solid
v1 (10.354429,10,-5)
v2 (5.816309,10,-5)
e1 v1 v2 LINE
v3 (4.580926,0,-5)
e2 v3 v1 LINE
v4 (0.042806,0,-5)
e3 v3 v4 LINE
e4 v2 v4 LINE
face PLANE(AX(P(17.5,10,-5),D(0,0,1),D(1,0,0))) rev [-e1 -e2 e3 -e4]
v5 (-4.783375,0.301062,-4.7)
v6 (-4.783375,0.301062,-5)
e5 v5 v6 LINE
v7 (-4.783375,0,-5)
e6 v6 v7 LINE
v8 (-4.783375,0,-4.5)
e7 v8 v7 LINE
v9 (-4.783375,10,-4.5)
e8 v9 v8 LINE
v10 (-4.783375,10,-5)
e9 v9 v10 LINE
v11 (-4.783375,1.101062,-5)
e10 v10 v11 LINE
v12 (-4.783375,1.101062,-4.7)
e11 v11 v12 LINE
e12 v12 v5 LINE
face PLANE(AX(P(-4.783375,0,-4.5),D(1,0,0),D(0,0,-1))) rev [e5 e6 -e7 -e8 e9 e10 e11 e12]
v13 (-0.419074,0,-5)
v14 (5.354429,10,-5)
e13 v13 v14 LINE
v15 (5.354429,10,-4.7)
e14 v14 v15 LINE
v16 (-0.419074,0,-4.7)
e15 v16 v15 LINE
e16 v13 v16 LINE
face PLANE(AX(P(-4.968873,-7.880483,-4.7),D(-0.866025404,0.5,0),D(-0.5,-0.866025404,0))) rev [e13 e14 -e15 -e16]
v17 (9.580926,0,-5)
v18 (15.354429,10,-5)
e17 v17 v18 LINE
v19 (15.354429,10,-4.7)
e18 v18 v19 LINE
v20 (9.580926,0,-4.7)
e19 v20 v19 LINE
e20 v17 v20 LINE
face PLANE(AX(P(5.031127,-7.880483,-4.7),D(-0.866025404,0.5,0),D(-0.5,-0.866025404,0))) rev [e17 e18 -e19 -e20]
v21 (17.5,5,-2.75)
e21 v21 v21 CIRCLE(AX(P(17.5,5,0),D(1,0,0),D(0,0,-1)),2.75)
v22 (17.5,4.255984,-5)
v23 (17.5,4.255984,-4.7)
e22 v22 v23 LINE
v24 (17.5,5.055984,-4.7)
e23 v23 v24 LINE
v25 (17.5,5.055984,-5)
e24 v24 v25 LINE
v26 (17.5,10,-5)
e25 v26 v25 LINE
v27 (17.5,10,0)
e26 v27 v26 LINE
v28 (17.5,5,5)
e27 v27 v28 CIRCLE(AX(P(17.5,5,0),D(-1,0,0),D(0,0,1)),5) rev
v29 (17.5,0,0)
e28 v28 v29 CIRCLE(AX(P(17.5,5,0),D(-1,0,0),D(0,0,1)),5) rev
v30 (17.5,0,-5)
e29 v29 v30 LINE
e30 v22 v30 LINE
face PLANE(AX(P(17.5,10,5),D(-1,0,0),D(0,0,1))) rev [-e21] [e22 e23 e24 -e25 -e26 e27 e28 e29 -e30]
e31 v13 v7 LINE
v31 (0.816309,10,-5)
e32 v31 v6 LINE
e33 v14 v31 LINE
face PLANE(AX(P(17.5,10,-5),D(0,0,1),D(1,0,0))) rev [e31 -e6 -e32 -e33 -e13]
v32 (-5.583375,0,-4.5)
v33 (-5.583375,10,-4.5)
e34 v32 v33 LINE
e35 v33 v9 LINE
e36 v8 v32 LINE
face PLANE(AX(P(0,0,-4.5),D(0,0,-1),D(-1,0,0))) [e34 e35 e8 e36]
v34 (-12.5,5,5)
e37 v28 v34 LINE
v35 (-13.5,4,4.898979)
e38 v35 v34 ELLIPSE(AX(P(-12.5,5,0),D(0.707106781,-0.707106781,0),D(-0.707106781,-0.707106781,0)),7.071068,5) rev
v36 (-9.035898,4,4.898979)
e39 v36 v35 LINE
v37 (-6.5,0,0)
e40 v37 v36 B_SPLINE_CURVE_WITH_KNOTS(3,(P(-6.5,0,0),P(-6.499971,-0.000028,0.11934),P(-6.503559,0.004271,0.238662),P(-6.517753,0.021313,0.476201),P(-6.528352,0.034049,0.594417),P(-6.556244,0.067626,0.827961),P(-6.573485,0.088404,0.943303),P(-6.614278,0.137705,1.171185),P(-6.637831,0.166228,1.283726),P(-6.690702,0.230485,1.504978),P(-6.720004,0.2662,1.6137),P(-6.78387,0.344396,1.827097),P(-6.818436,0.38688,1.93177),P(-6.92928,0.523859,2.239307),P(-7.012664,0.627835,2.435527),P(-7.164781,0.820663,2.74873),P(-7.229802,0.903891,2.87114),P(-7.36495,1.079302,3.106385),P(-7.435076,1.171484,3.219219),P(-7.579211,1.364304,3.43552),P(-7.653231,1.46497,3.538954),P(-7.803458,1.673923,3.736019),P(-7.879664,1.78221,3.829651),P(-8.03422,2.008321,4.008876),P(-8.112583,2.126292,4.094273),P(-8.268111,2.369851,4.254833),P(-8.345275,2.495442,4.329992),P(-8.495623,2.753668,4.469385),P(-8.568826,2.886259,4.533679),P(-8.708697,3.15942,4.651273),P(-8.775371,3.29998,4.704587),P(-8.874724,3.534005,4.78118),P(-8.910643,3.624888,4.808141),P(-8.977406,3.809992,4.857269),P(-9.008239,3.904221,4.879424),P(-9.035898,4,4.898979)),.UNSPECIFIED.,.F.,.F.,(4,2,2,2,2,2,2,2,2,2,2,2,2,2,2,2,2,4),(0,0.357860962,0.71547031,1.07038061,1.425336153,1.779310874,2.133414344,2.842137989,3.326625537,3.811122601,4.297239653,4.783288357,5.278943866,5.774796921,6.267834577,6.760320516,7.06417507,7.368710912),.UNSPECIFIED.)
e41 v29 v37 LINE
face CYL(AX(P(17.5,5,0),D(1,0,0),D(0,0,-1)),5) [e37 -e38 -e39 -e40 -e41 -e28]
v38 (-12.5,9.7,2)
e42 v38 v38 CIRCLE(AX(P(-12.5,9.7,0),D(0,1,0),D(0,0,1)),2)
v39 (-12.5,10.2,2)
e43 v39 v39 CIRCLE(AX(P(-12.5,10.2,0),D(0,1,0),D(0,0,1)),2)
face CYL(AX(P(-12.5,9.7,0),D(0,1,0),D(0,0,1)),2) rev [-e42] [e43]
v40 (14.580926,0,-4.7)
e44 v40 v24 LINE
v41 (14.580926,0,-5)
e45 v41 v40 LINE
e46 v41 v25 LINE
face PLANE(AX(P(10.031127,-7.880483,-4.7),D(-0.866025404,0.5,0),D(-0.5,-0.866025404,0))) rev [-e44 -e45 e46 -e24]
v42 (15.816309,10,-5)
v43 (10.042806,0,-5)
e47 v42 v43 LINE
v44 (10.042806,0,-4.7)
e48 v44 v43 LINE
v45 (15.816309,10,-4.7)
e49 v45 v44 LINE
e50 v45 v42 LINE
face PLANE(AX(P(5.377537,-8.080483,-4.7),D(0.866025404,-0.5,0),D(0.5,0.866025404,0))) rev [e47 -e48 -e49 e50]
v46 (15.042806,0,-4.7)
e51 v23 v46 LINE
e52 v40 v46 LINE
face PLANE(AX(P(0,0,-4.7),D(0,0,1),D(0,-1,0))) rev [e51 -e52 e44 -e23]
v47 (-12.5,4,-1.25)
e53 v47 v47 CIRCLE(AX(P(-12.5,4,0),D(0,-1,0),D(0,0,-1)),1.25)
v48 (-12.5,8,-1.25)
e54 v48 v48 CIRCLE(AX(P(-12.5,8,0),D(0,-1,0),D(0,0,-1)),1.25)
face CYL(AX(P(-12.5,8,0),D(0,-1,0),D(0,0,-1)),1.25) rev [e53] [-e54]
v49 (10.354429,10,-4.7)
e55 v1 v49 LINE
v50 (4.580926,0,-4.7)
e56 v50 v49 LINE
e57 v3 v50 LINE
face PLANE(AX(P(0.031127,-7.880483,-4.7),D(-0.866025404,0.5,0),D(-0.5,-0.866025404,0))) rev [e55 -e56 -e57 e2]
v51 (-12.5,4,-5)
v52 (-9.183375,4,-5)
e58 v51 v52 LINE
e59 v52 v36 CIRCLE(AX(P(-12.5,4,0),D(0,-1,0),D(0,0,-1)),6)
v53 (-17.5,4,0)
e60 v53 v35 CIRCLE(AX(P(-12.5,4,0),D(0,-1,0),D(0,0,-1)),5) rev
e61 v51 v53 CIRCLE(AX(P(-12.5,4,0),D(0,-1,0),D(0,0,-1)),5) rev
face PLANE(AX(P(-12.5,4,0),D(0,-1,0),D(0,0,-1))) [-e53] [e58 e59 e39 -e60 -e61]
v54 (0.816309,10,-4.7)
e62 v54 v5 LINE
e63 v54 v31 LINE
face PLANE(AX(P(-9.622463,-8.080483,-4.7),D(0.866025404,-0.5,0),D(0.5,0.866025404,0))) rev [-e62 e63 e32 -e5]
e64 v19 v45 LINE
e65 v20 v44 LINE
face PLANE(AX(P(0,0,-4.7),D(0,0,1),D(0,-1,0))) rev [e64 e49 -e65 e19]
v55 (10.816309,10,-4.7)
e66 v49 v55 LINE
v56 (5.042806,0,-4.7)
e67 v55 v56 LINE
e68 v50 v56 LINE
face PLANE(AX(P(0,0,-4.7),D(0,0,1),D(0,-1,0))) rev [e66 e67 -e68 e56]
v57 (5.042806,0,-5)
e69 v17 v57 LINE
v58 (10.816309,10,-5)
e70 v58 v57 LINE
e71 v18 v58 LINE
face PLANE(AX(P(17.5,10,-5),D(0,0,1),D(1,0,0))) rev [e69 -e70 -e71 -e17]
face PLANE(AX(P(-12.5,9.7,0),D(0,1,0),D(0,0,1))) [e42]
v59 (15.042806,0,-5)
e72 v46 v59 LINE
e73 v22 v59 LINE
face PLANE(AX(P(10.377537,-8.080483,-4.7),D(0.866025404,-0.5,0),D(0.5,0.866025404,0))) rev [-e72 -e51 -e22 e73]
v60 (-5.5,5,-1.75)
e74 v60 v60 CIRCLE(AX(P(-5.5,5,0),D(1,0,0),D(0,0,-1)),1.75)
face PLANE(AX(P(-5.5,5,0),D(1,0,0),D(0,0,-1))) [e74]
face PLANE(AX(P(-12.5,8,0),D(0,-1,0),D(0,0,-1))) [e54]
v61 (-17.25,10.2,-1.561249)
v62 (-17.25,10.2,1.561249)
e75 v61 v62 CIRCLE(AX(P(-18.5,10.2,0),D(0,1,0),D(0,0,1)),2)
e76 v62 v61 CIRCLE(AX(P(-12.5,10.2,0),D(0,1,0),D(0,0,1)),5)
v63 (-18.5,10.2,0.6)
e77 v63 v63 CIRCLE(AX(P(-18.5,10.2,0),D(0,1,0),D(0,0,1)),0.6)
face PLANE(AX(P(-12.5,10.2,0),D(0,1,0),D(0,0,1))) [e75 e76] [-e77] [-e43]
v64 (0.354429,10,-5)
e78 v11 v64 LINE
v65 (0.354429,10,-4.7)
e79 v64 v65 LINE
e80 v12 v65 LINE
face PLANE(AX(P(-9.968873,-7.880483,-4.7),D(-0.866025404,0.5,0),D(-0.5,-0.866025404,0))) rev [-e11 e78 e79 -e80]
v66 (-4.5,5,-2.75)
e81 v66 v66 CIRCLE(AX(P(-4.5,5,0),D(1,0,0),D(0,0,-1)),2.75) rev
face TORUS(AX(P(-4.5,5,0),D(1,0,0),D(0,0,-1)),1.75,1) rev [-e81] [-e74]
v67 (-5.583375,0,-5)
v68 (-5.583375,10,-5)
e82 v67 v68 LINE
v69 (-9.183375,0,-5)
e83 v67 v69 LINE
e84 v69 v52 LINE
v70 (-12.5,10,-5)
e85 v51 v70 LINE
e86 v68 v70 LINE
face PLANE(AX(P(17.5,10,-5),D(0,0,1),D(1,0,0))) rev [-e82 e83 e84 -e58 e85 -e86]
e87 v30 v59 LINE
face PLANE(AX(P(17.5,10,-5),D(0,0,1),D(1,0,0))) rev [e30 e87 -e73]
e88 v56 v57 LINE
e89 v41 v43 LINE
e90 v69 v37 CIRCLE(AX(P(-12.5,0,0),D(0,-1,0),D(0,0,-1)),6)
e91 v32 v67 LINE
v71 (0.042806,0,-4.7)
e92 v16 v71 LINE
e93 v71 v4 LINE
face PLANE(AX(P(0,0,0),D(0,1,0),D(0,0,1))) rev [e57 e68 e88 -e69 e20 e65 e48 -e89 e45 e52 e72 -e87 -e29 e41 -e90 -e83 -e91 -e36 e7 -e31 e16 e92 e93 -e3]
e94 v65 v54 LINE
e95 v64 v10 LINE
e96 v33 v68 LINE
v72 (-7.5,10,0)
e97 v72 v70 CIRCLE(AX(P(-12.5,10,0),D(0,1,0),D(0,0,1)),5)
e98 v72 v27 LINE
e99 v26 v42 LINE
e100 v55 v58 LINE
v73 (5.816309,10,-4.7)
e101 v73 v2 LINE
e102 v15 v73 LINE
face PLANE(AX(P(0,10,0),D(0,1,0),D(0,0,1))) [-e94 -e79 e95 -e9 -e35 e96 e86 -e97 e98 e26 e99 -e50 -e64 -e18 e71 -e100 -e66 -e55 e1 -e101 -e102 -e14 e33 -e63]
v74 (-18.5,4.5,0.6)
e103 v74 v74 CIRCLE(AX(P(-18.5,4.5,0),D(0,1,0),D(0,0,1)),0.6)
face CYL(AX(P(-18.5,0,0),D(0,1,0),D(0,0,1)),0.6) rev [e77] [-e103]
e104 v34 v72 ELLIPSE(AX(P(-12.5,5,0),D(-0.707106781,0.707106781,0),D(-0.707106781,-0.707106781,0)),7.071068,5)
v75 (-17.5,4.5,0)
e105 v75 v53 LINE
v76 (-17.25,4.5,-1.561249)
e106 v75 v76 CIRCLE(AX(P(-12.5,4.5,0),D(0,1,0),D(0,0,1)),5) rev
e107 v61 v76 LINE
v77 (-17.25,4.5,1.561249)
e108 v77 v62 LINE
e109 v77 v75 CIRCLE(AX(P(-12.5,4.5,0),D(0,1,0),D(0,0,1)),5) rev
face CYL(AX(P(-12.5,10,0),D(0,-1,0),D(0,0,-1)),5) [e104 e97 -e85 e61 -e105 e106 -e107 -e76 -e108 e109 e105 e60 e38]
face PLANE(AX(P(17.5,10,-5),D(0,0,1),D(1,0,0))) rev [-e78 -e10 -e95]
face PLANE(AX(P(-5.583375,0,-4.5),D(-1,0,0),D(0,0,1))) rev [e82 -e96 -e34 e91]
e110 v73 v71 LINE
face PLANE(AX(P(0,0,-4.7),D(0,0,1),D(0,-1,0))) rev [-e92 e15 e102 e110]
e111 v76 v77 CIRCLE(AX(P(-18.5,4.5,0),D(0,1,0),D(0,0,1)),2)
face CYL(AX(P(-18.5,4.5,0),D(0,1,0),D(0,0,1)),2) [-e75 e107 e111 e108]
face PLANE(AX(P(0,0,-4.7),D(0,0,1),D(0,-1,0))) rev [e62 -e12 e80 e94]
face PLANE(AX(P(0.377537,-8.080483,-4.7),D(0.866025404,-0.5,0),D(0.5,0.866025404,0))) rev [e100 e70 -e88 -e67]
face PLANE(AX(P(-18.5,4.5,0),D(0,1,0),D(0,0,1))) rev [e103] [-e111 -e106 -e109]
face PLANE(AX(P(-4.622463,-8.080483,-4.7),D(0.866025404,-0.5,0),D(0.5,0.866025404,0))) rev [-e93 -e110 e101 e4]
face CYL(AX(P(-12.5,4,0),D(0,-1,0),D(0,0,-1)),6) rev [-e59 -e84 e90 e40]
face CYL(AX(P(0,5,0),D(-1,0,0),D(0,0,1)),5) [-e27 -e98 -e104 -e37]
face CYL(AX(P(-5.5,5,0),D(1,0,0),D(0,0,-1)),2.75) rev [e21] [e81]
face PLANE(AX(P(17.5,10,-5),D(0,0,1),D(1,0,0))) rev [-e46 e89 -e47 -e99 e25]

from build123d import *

# Parameters (mm, degrees)
SKETCH_1_W          = 35
SKETCH_1_H          = 10
EXTRUDE_1_DEPTH     = 10
FILLET_1_R          = 5
SKETCH_3_R          = 6
CUT_EXTRUDE_1_DEPTH = 4
SKETCH_7_R          = 5
EXTRUDE_4_DEPTH     = 0.2
SKETCH_8_R          = 2
CUT_EXTRUDE_3_DEPTH = 0.5
FILLET_3_R          = 5
SKETCH_10_R         = 2
EXTRUDE_5_DEPTH     = 5.7
SKETCH_11_R         = 0.6
CUT_EXTRUDE_4_DEPTH = 24.436936812
SKETCH_12_R         = 2.75
CUT_EXTRUDE_5_DEPTH = 23
SKETCH_6_R          = 1.25
CUT_EXTRUDE_6_DEPTH = 4
FILLET_4_R          = 1
SKETCH_13_W         = 0.8
SKETCH_13_H         = 10
CUT_EXTRUDE_7_DEPTH = 0.5
CUT_EXTRUDE_8_DEPTH = 0.3


# Some blends are built 0.0001 mm under size
with BuildPart() as part:
    # 草图1 → 凸台-拉伸1 (new body)
    with BuildSketch(Plane(origin=(0, 0, 0), x_dir=(1, 0, 0), z_dir=(0, 1, 0))):
        Rectangle(SKETCH_1_W, SKETCH_1_H)
    extrude(amount=EXTRUDE_1_DEPTH)

    # 圆角1
    fillet_1_edges = [part.edges().sort_by_distance(p)[0] for p in [
        (-17.5, 5, 5),
        (-17.5, 5, -5),
    ]]
    fillet(fillet_1_edges, radius=FILLET_1_R - 0.0001)  # a hair under: the kernel refuses the full size

    # 草图3 → 切除-拉伸1 (cut)
    with BuildSketch(Plane.XZ):
        with Locations((-12.5, 0)):
            Circle(SKETCH_3_R)
    extrude(amount=-CUT_EXTRUDE_1_DEPTH, mode=Mode.SUBTRACT)

    # 草图7 → 凸台-拉伸4 (add)
    with BuildSketch(Plane(origin=(0, 10, 0), x_dir=(1, 0, 0), z_dir=(0, 1, 0))):
        with Locations(Location((-12.5, 0, 0), (0, 0, 270))):
            Circle(SKETCH_7_R)
    extrude(amount=EXTRUDE_4_DEPTH)

    # 草图8 → 切除-拉伸3 (cut)
    with BuildSketch(Plane(origin=(0, 10.2, 0), x_dir=(1, 0, 0), z_dir=(0, 1, 0))):
        with Locations(Location((-12.5, 0, 0), (0, 0, 270))):
            Circle(SKETCH_8_R)
    extrude(amount=-CUT_EXTRUDE_3_DEPTH, mode=Mode.SUBTRACT)

    # 圆角3
    # the kernel refuses this fillet: 5 mm, written as the material it takes off along each edge
    with BuildSketch(Plane(origin=(30, 0, 5), x_dir=(0, 1, 0), z_dir=(-1, 0, 0))) as fillet_3_piece_1:
        with BuildLine():
            CenterArc((FILLET_3_R, FILLET_3_R), FILLET_3_R, 180, 90)
            Line((0, FILLET_3_R), (0, 0))
            Line((0, 0), (FILLET_3_R, 0))
        make_face()
    extrude(amount=51.68337521, mode=Mode.SUBTRACT)
    with BuildSketch(Plane(origin=(30, 10, 5), x_dir=(0, -1, 0), z_dir=(-1, 0, 0))) as fillet_3_piece_2_section:
        with BuildLine():
            CenterArc((FILLET_3_R, -FILLET_3_R), FILLET_3_R, 90, 90)
            Line((0, -FILLET_3_R), (0, 0))
            Line((0, 0), (FILLET_3_R, 0))
        make_face()
    fillet_3_piece_2 = extrude(amount=55, mode=Mode.PRIVATE)
    fillet_3_piece_2 = fillet_3_piece_2 - Plane(origin=(-12.5, 8.593554342, 0), x_dir=(0, 0, 1), z_dir=(0, -1, 0)) * Cylinder(5, 130, mode=Mode.PRIVATE)
    add(fillet_3_piece_2, mode=Mode.SUBTRACT)

    # 草图10 → 凸台-拉伸5 (add)
    with BuildSketch(Plane(origin=(0, 10.2, 0), x_dir=(1, 0, 0), z_dir=(0, 1, 0))):
        with Locations((-18.5, 0)):
            Circle(SKETCH_10_R)
    extrude(amount=-EXTRUDE_5_DEPTH)

    # 草图11 → 切除-拉伸4 (cut, through all)
    with BuildSketch(Plane(origin=(0, 10.2, 0), x_dir=(1, 0, 0), z_dir=(0, 1, 0))):
        with Locations(Location((-18.5, 0, 0), (0, 0, 270))):
            Circle(SKETCH_11_R)
    extrude(amount=-CUT_EXTRUDE_4_DEPTH, mode=Mode.SUBTRACT)

    # 草图12 → 切除-拉伸5 (cut)
    with BuildSketch(Plane(origin=(17.5, 0, 0), x_dir=(0, 0, -1), z_dir=(1, 0, 0))):
        with Locations((0, 5)):
            Circle(SKETCH_12_R)
    extrude(amount=-CUT_EXTRUDE_5_DEPTH, mode=Mode.SUBTRACT)

    # 草图6 → 切除-拉伸6 (cut)
    with BuildSketch(Plane.XZ.offset(-4)):
        with Locations(Location((-12.5, 0, 0), (0, 0, 270))):
            Circle(SKETCH_6_R)
    extrude(amount=-CUT_EXTRUDE_6_DEPTH, mode=Mode.SUBTRACT)

    # 圆角4
    fillet_4_edges = [part.edges().sort_by_distance(p)[0] for p in [
        (-5.5, 5, 2.75),
    ]]
    fillet(fillet_4_edges, radius=FILLET_4_R)

    # 草图13 → 切除-拉伸7 (cut)
    with BuildSketch(Plane(origin=(0, 0, -5), x_dir=(-1, 0, 0), z_dir=(0, 0, -1))):
        with Locations((5.18337521, 5)):
            Rectangle(SKETCH_13_W, SKETCH_13_H)
    extrude(amount=-CUT_EXTRUDE_7_DEPTH, mode=Mode.SUBTRACT)

    # 草图14 → 切除-拉伸8 (cut)
    with BuildSketch(Plane(origin=(0, 0, -5), x_dir=(-1, 0, 0), z_dir=(0, 0, -1))):
        Polygon((-10.031126924, -7.880483284), (-20.59026218, 10.408475463), (-20.936672342, 10.208475463), (-10.377537086, -8.080483284), align=None)
        Polygon((-5.031126924, -7.880483284), (-15.59026218, 10.408475463), (-15.936672342, 10.208475463), (-5.377537086, -8.080483284), align=None)
        Polygon((-0.031126924, -7.880483284), (-10.59026218, 10.408475463), (-10.936672342, 10.208475463), (-0.377537086, -8.080483284), align=None)
        Polygon((4.968873076, -7.880483284), (-5.59026218, 10.408475463), (-5.936672342, 10.208475463), (4.622462914, -8.080483284), align=None)
        Polygon((9.968873076, -7.880483284), (-0.59026218, 10.408475463), (-0.936672342, 10.208475463), (9.622462914, -8.080483284), align=None)
    extrude(amount=-CUT_EXTRUDE_8_DEPTH, mode=Mode.SUBTRACT)


solid = part.part
